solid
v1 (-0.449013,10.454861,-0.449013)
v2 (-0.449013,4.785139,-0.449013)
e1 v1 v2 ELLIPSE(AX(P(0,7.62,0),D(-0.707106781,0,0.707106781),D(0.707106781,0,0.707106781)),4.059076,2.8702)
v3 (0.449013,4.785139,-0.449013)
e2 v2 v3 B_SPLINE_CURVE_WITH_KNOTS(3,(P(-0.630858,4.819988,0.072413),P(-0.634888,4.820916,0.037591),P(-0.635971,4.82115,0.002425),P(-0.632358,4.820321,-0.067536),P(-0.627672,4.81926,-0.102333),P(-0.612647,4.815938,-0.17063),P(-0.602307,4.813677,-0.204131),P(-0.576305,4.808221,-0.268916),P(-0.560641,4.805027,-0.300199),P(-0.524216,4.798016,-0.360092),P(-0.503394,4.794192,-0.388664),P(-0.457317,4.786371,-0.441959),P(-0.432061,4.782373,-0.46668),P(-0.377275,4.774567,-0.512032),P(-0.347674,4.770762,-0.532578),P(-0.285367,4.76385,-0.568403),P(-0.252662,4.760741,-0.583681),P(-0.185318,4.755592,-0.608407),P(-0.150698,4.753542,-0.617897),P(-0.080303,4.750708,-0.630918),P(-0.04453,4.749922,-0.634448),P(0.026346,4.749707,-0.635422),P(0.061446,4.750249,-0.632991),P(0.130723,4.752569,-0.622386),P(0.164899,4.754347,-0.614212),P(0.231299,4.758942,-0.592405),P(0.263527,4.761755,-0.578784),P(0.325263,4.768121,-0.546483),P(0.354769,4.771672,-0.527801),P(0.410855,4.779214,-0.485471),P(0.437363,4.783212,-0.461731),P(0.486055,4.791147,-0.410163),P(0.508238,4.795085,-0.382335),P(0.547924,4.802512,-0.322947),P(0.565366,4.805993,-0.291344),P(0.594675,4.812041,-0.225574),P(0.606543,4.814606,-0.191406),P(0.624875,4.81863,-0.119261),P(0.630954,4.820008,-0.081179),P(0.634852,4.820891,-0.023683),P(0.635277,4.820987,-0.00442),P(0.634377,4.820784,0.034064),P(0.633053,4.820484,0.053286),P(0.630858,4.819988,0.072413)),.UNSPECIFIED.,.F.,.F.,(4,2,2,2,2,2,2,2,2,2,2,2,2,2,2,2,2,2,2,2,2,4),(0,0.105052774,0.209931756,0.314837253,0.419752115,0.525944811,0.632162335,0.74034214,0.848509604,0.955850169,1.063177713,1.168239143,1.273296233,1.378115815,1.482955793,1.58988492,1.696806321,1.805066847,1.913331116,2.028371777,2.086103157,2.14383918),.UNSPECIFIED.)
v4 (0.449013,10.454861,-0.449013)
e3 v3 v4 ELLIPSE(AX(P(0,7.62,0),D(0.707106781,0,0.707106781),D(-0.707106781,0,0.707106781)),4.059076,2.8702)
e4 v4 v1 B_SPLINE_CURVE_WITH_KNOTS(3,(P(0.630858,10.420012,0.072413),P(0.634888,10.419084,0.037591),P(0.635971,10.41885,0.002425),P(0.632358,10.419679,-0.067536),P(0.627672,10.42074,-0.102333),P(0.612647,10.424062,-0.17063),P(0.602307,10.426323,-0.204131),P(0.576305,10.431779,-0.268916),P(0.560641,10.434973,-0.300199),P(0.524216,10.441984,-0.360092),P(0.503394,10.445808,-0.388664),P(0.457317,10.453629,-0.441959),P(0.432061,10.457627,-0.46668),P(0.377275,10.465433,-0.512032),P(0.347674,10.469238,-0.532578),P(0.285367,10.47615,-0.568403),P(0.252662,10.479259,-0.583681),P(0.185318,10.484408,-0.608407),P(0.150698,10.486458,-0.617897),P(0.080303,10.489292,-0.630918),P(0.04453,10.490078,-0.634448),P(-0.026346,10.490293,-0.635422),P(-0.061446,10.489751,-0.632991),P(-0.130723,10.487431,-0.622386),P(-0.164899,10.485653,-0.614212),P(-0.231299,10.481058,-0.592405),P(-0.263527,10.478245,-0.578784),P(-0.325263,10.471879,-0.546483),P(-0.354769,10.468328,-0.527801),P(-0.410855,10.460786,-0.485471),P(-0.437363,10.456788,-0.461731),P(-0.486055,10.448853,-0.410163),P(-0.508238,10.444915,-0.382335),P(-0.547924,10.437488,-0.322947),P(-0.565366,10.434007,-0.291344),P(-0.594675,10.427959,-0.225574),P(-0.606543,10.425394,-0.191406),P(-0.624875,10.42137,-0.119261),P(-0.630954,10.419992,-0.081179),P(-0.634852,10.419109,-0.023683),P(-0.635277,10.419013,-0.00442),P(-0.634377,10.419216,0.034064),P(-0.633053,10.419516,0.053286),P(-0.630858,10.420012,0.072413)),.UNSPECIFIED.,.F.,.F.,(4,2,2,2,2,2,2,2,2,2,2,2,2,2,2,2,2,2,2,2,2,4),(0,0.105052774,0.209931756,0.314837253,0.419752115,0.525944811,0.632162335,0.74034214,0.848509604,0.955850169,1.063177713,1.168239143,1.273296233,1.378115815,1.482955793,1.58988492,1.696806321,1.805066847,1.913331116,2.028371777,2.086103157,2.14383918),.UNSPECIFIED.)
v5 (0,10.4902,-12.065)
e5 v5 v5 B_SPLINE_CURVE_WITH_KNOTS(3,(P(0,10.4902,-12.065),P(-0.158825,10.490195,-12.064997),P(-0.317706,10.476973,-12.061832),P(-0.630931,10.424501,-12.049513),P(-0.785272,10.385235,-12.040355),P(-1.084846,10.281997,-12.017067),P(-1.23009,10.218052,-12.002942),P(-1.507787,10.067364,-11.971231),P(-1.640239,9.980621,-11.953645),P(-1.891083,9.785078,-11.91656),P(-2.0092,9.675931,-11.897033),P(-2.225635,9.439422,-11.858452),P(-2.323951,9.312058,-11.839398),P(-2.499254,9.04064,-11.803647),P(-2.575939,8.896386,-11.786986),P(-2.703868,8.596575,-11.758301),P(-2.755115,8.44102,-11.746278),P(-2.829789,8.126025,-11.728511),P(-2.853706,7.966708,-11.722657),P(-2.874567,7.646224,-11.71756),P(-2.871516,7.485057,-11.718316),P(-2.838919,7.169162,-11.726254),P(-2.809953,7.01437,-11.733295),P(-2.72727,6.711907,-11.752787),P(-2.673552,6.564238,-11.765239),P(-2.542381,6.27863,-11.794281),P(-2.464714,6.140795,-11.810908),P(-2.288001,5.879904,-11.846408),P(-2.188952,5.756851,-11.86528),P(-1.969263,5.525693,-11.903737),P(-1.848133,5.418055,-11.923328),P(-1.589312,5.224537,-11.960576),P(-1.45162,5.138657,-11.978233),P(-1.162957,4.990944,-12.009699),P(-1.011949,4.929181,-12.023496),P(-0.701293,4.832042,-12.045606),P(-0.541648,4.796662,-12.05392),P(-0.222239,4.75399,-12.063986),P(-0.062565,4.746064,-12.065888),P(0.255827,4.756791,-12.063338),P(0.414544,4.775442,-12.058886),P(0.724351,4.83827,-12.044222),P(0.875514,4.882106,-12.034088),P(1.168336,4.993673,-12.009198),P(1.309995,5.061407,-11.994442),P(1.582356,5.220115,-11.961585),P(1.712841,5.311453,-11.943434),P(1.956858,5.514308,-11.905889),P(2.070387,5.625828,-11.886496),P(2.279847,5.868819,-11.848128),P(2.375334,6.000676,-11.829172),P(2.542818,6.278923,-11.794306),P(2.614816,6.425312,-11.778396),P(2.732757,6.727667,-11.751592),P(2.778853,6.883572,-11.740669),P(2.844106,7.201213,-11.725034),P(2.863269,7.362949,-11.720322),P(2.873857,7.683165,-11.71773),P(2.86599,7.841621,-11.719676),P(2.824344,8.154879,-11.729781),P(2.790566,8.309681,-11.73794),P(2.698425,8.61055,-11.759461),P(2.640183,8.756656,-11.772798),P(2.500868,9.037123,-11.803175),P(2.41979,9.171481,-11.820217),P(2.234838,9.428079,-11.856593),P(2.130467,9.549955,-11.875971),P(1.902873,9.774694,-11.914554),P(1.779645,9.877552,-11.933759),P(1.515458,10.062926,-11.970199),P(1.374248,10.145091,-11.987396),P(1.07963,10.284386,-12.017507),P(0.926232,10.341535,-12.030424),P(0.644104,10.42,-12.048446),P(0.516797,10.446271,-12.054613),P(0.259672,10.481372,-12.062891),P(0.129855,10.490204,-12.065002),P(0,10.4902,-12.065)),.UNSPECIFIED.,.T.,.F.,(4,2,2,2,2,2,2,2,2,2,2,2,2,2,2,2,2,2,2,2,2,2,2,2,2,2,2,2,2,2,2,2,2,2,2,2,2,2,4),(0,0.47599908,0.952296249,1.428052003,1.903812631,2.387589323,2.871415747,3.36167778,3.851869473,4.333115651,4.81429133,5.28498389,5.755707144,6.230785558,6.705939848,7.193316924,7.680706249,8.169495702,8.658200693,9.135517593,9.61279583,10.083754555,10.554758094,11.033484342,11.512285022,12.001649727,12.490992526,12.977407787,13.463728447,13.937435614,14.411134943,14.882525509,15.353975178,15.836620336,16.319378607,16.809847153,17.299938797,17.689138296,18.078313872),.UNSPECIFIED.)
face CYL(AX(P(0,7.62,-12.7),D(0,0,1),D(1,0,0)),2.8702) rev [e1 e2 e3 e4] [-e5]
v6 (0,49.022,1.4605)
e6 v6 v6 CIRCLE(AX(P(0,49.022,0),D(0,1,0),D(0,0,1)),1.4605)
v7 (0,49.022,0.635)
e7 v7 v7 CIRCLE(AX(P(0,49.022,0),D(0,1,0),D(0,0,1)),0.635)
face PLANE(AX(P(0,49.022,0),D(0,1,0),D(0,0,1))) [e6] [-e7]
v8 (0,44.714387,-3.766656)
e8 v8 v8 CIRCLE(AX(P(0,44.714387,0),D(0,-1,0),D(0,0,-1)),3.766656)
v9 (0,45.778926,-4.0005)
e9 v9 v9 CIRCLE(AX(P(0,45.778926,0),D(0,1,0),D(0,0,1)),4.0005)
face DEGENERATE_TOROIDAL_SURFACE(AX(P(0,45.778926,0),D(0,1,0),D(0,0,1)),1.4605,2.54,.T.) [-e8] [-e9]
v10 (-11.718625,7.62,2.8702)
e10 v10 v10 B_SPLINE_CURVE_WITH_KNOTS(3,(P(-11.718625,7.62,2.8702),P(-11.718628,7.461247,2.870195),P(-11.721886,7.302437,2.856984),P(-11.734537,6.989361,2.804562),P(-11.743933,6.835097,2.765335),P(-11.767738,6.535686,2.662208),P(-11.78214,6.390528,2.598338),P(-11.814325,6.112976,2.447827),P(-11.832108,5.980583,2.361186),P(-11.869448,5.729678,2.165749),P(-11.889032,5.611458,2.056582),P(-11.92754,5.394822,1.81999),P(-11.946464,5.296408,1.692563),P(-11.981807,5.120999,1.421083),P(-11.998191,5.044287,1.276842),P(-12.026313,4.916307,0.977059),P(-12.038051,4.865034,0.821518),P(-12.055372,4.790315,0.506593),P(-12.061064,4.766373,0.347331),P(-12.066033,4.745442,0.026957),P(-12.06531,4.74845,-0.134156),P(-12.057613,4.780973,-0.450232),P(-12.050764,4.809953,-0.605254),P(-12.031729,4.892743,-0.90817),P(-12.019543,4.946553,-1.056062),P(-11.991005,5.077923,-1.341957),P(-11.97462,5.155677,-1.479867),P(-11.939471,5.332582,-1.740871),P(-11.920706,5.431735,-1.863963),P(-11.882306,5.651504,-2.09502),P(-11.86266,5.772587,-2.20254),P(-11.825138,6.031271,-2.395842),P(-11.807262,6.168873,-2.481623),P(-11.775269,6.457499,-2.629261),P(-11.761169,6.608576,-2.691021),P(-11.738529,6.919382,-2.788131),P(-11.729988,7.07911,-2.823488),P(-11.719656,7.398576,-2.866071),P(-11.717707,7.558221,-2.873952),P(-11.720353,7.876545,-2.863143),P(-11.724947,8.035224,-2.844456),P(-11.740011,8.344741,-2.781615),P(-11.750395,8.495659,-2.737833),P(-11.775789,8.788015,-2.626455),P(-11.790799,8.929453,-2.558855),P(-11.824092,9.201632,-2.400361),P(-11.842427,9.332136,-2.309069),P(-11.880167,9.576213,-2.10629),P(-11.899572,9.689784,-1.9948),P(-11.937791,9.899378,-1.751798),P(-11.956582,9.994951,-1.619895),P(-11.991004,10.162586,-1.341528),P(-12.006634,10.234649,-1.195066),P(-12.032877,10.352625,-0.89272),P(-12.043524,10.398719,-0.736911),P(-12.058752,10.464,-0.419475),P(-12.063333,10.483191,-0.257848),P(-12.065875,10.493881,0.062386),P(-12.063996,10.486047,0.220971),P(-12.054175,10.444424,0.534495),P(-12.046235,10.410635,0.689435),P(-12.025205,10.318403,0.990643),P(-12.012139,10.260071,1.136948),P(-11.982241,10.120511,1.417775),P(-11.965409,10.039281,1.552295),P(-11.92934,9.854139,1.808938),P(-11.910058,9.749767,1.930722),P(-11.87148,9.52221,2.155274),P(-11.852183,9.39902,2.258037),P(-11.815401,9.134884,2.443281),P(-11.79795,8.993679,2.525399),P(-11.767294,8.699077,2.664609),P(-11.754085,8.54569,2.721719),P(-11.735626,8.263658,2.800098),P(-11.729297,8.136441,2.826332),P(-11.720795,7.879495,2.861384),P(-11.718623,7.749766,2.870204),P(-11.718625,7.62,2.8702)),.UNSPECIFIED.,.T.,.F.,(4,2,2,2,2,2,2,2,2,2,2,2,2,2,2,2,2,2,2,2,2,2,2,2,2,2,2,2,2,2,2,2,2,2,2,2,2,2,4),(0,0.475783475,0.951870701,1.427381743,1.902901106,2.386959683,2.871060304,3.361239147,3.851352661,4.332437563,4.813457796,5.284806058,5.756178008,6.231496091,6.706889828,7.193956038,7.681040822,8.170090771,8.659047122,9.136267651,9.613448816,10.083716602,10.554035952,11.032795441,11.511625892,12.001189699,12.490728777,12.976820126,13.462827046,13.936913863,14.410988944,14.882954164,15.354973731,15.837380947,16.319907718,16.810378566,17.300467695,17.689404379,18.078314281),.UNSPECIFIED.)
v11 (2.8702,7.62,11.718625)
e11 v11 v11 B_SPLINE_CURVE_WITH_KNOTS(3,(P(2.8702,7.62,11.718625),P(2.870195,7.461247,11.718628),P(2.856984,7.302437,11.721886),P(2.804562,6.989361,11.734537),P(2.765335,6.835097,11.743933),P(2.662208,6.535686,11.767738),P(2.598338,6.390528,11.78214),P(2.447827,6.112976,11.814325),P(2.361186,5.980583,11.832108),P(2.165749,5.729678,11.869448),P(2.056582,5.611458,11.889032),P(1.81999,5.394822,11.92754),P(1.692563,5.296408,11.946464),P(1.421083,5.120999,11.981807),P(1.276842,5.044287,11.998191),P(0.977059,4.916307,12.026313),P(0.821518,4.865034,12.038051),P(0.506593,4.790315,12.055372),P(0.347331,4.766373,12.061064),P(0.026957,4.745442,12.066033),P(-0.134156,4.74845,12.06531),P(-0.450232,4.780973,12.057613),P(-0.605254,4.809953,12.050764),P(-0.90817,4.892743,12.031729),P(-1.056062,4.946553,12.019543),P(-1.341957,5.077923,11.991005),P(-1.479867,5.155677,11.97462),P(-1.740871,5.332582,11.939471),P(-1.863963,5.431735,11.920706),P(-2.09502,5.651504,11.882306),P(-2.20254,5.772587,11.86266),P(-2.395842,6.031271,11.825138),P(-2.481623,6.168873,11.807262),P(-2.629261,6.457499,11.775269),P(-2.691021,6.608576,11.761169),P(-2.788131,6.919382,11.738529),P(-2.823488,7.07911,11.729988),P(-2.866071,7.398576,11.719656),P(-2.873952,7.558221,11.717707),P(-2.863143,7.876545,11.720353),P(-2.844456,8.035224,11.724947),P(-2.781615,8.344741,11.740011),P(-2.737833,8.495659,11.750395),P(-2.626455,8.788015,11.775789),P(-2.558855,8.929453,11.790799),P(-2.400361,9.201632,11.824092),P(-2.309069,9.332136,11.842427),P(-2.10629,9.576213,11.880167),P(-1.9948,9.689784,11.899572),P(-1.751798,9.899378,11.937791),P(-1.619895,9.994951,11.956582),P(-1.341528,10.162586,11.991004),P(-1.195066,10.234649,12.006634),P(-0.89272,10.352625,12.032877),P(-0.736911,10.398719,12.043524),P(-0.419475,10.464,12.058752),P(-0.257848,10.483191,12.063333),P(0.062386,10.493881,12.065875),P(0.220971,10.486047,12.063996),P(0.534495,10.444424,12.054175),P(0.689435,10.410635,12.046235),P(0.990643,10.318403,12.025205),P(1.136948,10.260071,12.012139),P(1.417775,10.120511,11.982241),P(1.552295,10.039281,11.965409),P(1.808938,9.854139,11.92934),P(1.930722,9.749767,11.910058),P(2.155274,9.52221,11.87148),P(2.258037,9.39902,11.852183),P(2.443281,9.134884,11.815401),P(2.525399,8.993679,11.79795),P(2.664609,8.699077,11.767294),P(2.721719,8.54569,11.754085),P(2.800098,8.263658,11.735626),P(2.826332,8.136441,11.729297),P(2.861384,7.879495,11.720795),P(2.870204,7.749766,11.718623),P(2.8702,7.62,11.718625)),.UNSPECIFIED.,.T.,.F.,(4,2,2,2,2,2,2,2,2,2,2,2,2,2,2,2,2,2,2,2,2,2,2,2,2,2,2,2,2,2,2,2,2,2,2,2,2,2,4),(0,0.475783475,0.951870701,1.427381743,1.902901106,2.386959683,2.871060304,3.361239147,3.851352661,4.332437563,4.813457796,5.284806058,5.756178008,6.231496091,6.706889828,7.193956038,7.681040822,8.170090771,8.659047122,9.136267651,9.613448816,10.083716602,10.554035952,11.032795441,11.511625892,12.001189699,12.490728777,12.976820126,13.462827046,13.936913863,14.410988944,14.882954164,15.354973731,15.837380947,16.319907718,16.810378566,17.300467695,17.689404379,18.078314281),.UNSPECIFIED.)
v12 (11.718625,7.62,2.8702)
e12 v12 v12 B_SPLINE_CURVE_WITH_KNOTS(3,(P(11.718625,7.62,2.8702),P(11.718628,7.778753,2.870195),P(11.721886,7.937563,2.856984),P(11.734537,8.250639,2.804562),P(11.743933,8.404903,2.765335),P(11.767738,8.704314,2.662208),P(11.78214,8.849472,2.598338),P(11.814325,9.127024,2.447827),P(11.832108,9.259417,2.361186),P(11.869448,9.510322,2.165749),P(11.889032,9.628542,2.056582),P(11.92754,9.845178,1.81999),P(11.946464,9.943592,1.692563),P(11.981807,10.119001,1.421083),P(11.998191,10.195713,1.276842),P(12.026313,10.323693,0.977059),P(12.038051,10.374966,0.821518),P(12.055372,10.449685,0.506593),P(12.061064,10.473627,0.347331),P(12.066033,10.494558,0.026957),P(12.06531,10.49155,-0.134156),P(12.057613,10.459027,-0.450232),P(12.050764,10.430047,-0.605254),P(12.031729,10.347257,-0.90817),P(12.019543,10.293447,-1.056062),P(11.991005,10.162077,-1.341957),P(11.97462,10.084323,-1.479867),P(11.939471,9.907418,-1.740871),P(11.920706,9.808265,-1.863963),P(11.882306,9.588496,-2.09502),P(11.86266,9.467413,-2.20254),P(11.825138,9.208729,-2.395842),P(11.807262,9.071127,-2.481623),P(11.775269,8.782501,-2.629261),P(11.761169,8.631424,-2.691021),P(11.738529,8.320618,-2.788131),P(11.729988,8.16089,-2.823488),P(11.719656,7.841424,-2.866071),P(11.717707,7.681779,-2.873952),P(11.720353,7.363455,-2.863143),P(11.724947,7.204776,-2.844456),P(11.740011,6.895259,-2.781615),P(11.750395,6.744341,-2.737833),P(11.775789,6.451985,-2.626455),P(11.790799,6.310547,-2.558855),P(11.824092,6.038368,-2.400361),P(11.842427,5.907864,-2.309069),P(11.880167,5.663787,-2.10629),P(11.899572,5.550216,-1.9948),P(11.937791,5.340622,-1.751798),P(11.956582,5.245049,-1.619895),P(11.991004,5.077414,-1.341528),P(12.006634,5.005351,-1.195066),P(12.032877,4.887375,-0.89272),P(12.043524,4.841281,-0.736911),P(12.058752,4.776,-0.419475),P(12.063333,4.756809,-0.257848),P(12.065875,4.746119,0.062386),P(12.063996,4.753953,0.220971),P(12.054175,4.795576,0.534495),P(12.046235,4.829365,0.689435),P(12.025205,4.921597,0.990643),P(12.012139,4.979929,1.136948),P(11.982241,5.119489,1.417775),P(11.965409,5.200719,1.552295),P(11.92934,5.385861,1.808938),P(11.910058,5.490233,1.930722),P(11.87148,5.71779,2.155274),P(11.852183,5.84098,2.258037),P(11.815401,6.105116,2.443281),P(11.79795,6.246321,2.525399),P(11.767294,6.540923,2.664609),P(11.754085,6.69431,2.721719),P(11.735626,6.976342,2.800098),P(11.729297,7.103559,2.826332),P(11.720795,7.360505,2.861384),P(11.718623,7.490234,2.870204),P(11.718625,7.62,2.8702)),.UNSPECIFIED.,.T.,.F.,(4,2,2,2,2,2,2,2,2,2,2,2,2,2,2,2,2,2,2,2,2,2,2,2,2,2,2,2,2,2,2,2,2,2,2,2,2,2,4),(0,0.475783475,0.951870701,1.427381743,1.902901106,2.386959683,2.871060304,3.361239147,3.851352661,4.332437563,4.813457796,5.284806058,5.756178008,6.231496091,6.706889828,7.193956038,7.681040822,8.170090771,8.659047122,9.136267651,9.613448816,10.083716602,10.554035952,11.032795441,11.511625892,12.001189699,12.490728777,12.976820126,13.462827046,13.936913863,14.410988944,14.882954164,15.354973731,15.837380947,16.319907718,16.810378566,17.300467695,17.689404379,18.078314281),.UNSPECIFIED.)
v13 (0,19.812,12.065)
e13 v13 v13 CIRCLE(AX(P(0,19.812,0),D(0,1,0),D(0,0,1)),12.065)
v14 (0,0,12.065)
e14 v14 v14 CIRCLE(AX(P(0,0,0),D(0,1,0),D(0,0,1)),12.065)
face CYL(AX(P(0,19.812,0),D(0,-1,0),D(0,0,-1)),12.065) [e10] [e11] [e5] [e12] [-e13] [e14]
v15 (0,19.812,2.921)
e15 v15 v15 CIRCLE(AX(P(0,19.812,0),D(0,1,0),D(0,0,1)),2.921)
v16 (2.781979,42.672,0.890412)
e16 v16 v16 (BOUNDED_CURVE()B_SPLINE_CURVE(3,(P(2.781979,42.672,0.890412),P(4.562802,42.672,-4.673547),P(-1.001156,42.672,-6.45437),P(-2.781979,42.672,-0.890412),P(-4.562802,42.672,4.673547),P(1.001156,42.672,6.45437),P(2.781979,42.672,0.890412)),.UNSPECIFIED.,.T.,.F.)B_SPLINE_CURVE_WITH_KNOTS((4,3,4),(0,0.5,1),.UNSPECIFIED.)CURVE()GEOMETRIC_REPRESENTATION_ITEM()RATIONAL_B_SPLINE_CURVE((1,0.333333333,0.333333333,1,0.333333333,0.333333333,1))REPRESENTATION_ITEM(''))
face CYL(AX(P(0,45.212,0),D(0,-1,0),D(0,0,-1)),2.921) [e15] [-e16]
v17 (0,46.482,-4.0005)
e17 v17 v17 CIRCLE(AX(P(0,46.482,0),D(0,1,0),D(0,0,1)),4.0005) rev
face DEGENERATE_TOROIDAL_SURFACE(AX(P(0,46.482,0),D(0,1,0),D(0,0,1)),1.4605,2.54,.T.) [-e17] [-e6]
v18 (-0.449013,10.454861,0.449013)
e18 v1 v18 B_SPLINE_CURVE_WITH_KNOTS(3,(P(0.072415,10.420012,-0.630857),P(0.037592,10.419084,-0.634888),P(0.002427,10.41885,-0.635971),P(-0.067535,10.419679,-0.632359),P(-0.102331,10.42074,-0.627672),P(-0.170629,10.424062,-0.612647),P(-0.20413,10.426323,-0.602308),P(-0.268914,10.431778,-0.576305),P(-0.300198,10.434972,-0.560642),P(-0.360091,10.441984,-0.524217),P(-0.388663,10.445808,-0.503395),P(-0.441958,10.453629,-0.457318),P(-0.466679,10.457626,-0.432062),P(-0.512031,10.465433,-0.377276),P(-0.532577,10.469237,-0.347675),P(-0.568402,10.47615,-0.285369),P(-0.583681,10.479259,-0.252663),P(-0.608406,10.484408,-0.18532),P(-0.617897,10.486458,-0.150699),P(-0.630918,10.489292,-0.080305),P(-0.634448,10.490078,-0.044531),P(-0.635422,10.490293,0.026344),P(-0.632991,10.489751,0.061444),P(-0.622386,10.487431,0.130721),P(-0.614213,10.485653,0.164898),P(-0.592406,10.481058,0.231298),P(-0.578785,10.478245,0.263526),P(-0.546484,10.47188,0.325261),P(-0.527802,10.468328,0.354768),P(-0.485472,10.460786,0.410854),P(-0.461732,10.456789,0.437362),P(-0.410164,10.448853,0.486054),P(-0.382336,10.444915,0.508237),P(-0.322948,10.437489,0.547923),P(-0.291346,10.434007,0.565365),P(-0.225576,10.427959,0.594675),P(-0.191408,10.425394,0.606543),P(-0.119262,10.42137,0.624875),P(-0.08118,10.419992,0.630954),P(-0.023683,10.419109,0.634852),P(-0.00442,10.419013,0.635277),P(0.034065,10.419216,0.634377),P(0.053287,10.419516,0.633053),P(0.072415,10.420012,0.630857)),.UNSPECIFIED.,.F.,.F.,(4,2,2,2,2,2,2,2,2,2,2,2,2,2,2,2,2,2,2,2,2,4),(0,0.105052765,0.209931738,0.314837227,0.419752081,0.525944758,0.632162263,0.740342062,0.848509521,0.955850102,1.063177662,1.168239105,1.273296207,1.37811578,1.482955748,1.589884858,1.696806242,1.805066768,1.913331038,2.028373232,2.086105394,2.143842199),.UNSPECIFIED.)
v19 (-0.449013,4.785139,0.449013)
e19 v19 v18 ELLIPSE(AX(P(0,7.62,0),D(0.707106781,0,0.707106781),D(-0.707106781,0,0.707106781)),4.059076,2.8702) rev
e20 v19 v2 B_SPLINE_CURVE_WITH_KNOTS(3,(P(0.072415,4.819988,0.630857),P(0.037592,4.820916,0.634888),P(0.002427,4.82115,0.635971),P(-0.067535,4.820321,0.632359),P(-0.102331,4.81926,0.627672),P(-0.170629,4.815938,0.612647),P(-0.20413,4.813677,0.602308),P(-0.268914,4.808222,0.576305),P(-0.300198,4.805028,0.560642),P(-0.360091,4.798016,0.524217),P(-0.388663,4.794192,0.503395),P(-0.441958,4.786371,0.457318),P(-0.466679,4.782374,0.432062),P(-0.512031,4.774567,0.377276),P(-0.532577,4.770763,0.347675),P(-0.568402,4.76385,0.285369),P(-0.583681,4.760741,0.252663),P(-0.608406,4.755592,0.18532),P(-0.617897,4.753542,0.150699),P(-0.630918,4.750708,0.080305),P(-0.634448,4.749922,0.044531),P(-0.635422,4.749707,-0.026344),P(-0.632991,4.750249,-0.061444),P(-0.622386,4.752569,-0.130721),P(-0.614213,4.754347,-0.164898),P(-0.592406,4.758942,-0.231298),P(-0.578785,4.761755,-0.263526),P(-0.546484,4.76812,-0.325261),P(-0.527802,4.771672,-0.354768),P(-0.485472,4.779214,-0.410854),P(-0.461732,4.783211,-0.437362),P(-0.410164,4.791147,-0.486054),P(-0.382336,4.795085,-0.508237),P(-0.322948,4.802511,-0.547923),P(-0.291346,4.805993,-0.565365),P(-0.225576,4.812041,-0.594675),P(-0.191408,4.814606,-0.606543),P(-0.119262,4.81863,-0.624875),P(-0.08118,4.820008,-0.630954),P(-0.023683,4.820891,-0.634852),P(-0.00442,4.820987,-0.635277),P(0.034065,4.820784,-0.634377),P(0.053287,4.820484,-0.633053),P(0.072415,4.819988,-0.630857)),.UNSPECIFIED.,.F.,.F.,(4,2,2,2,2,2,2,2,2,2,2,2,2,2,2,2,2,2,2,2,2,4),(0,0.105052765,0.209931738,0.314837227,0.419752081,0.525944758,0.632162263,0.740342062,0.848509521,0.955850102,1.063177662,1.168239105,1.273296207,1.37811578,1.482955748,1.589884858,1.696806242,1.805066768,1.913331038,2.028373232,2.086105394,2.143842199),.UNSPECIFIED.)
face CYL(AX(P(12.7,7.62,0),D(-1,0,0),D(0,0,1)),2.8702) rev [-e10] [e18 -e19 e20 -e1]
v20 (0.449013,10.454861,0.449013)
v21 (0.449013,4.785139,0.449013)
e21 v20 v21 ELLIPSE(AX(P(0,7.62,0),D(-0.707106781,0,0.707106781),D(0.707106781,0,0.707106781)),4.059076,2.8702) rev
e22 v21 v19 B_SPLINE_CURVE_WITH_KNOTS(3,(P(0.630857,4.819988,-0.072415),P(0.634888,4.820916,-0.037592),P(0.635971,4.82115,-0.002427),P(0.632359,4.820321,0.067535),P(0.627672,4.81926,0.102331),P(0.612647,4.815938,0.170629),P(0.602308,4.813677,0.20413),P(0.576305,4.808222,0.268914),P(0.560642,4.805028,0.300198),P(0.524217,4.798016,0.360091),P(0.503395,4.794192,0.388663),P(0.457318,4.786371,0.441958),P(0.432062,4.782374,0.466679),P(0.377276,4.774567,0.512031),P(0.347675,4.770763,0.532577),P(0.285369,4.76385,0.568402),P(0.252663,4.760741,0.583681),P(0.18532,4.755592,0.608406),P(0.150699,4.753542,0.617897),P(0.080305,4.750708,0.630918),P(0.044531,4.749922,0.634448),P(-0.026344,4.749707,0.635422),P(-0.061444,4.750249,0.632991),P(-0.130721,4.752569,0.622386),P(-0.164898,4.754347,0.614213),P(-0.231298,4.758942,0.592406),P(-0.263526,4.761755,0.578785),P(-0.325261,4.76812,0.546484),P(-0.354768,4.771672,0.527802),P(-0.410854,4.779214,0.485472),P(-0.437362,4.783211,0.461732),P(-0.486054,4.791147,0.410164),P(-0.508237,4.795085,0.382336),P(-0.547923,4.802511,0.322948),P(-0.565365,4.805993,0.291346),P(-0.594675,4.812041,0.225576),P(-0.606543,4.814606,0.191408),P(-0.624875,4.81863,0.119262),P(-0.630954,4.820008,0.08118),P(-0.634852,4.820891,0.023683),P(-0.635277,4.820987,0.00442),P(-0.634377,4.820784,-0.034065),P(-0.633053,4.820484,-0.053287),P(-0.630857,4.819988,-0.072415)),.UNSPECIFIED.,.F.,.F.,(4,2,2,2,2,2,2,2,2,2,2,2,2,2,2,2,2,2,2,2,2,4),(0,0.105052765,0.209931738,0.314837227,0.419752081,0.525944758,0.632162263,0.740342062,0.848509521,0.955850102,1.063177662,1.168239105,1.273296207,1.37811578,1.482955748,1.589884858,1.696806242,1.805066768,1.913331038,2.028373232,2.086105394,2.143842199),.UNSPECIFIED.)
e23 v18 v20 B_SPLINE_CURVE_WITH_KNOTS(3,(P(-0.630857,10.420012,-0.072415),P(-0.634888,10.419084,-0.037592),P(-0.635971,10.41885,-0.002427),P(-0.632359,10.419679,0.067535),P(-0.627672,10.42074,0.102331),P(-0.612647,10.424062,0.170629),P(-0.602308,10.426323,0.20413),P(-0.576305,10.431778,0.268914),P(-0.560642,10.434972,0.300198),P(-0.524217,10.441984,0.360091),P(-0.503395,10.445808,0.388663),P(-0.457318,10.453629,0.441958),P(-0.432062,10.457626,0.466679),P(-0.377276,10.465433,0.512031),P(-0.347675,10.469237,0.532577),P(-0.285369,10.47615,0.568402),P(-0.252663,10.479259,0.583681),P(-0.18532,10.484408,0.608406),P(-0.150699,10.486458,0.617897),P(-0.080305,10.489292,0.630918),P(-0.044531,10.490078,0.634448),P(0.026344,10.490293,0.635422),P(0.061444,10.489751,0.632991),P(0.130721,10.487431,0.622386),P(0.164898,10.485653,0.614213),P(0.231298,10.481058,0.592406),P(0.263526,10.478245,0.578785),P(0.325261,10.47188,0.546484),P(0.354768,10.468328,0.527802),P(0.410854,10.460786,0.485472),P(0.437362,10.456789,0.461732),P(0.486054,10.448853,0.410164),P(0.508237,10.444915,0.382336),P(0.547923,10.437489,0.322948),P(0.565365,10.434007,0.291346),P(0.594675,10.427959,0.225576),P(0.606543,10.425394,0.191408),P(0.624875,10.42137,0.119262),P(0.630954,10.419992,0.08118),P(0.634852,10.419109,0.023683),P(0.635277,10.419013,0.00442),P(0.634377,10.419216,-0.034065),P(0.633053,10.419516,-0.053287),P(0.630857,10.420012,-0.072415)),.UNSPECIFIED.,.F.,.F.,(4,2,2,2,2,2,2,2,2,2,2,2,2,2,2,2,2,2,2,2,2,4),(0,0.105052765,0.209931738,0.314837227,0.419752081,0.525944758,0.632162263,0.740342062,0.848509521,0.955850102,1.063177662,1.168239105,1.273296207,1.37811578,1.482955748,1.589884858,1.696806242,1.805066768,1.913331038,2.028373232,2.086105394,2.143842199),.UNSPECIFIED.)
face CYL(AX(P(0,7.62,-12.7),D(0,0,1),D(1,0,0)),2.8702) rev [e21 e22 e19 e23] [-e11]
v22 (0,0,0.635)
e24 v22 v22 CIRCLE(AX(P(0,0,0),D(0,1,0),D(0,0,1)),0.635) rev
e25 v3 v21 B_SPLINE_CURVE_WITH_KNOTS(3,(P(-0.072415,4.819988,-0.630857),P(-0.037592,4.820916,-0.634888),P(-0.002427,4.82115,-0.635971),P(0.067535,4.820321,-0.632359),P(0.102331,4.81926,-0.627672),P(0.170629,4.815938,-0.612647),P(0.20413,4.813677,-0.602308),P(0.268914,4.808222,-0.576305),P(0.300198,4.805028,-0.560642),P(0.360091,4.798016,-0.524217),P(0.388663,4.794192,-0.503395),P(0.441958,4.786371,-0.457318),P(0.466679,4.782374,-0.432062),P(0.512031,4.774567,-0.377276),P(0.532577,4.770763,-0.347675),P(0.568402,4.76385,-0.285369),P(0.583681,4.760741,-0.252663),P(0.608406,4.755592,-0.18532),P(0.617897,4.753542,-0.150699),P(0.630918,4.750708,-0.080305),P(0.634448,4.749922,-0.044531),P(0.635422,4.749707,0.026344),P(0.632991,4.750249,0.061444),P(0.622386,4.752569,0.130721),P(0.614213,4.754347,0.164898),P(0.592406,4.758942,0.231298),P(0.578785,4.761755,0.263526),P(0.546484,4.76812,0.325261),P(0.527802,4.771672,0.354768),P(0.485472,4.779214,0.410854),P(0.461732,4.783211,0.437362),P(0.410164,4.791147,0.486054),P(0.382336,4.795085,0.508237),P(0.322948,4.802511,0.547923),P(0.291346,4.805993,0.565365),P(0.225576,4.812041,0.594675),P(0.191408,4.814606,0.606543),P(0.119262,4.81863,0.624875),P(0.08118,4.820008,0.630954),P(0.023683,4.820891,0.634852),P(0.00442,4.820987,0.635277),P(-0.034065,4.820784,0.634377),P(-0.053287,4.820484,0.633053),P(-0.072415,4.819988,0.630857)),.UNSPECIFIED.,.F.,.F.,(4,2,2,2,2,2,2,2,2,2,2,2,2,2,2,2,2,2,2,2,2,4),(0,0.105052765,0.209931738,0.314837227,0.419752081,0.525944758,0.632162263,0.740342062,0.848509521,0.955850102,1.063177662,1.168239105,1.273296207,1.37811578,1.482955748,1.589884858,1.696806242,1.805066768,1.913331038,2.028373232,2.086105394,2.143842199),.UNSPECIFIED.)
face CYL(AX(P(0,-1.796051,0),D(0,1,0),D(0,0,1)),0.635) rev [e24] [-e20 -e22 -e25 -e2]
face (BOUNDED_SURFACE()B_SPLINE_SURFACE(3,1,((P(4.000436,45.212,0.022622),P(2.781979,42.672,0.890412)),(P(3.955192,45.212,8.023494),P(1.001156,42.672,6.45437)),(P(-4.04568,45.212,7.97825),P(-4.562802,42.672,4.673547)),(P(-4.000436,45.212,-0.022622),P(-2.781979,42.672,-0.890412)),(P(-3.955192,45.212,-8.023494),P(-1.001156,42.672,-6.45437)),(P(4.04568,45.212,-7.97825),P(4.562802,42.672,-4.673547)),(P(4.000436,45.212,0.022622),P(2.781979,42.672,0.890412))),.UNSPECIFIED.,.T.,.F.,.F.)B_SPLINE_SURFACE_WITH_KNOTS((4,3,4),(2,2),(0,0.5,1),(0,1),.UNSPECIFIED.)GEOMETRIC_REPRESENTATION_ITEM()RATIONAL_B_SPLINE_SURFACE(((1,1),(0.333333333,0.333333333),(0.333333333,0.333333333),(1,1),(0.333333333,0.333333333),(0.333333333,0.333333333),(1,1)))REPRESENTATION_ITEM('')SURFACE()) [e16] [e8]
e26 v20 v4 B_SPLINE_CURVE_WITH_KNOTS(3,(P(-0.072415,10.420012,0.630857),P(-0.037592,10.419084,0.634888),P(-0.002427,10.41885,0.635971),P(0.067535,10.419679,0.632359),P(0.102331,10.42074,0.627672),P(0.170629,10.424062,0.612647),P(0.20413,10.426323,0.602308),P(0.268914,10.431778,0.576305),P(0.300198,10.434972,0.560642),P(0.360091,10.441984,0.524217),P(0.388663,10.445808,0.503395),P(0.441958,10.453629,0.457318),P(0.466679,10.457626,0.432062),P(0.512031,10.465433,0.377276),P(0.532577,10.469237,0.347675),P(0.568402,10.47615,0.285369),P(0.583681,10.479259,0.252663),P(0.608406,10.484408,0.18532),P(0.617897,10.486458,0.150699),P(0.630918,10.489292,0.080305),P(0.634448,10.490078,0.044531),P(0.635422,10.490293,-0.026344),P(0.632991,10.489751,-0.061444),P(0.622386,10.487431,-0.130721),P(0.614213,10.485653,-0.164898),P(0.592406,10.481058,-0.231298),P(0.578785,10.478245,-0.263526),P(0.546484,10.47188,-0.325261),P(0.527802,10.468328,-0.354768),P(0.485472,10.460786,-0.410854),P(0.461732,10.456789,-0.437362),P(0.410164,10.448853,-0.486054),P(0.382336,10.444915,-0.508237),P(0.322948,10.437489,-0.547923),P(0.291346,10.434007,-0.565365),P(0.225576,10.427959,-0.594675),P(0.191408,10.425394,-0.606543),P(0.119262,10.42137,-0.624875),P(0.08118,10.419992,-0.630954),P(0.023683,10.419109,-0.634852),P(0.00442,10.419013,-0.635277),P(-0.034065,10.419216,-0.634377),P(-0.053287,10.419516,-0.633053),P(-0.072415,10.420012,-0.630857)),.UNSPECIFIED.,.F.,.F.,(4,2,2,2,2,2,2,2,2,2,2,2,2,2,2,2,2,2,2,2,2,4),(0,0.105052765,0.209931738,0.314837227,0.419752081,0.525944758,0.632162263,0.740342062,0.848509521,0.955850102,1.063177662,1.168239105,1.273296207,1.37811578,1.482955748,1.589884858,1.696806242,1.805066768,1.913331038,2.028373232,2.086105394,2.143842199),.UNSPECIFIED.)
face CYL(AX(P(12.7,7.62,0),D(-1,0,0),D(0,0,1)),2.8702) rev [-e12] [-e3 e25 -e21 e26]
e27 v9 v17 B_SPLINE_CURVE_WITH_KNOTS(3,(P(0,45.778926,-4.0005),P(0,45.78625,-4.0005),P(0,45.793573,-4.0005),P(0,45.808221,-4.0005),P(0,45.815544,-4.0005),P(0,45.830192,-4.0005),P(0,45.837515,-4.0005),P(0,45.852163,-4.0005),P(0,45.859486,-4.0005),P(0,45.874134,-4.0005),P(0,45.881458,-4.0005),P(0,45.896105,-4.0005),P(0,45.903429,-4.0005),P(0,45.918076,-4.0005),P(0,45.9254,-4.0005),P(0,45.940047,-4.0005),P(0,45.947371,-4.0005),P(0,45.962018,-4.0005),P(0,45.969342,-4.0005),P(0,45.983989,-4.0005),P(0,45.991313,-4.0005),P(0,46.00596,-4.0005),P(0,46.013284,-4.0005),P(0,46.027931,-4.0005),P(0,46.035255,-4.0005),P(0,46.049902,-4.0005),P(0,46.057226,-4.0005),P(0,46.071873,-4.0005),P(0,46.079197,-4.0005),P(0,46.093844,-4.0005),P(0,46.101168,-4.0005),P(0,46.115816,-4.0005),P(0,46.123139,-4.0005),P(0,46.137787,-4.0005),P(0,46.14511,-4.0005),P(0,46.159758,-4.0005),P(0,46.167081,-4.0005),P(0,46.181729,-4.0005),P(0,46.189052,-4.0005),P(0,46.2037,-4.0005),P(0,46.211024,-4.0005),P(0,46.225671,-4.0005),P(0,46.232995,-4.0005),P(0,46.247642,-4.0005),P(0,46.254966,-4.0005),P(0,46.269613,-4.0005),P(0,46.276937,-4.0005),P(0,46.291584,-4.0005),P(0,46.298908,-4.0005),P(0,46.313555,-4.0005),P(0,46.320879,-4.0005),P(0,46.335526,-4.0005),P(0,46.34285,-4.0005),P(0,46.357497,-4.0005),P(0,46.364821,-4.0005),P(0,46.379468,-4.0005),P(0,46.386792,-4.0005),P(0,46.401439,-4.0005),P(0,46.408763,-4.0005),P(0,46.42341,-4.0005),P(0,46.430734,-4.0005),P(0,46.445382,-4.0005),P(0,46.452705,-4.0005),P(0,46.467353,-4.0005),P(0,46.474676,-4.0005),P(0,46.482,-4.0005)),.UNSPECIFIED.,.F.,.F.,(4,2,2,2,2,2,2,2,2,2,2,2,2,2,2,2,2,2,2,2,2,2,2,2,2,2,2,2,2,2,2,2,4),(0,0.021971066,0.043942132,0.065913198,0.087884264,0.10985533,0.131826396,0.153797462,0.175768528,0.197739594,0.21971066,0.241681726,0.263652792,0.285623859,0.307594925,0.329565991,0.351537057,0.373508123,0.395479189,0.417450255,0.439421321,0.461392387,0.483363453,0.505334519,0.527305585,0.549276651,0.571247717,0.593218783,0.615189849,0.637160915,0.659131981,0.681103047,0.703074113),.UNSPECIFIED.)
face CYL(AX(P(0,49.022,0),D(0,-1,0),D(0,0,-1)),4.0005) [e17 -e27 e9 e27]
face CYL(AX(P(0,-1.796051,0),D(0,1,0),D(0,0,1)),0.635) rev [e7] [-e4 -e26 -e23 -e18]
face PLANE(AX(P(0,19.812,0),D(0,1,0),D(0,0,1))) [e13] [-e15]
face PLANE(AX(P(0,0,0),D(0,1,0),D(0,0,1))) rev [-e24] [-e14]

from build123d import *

# Parameters (mm, degrees)
SKETCH1_R           = 12.065
BOSS_EXTRUDE1_DEPTH = 19.812
SKETCH2_R           = 2.921
BOSS_EXTRUDE2_DEPTH = 25.4
SKETCH3_R           = 4.0005
BOSS_EXTRUDE3_DEPTH = 3.81
FILLET3_R           = 2.54
SKETCH7_R           = 2.8702
CUT_EXTRUDE1_DEPTH  = 12.7
CIRPATTERN1_COUNT   = 2
CIRPATTERN1_ANGLE   = 90
FILLET4_R           = 2.54
CUT_EXTRUDE2_REACH  = 53.907
SKETCH9_R           = 0.635


with BuildPart() as part:
    # Sketch1 → Boss-Extrude1 (new body)
    with BuildSketch(Plane(origin=(0, 0, 0), x_dir=(1, 0, 0), z_dir=(0, 1, 0))):
        with Locations(Location((0, 0, 0), (0, 0, 270))):
            Circle(SKETCH1_R)
    extrude(amount=BOSS_EXTRUDE1_DEPTH)

    # Sketch2 → Boss-Extrude2 (add)
    with BuildSketch(Plane(origin=(0, 19.812, 0), x_dir=(1, 0, 0), z_dir=(0, 1, 0))):
        with Locations(Location((0, 0, 0), (0, 0, 270))):
            Circle(SKETCH2_R)
    extrude(amount=BOSS_EXTRUDE2_DEPTH)

    # Sketch3 → Boss-Extrude3 (add)
    with BuildSketch(Plane(origin=(0, 45.212, 0), x_dir=(1, 0, 0), z_dir=(0, 1, 0))):
        with Locations(Location((0, 0, 0), (0, 0, 90))):
            Circle(SKETCH3_R)
    extrude(amount=BOSS_EXTRUDE3_DEPTH)

    # Fillet3
    fillet3_edges = [part.edges().sort_by_distance(p)[0] for p in [
        (0, 49.022, 4.0005),
    ]]
    fillet(fillet3_edges, radius=FILLET3_R)

    # Sketch7 → Cut-Extrude1 (cut, symmetric)
    with BuildSketch(Plane.XY):
        with Locations(Location((0, 7.62, 0), (0, 0, 90.000000025))):
            Circle(SKETCH7_R)
    cut_extrude1 = extrude(amount=CUT_EXTRUDE1_DEPTH, both=True, mode=Mode.SUBTRACT)

    # CirPattern1: Cut-Extrude1 ×2 about axis
    cirpattern1_axis = Axis((0, 45.212, 0), (0, -1, 0))
    for i in range(1, CIRPATTERN1_COUNT):
        add(cut_extrude1.rotate(cirpattern1_axis, i * CIRPATTERN1_ANGLE / (CIRPATTERN1_COUNT - 1)), mode=Mode.SUBTRACT)

    # Loft1: read off the stored shape, not the designer's step
    # Loft1: loft between two sections, ruled curve by curve
    loft1_from = [
        Edge.make_bspline([(4.000436037, 45.212, 0.022622174), (3.955191689, 45.212, 8.023494248), (-4.045680385, 45.212, 7.9782499), (-4.000436037, 45.212, -0.022622174), (-3.955191689, 45.212, -8.023494248), (4.045680385, 45.212, -7.9782499), (4.000436037, 45.212, 0.022622174)], [0, 0, 0, 0, 0.5, 0.5, 0.5, 1, 1, 1, 1], 3, [1, 0.333333333, 0.333333333, 1, 0.333333333, 0.333333333, 1]),
    ]
    loft1_to = [
        Edge.make_bspline([(2.781979214, 42.672, 0.890411509), (1.001156196, 42.672, 6.454369936), (-4.562802231, 42.672, 4.673546919), (-2.781979214, 42.672, -0.890411509), (-1.001156196, 42.672, -6.454369936), (4.562802231, 42.672, -4.673546919), (2.781979214, 42.672, 0.890411509)], [0, 0, 0, 0, 0.5, 0.5, 0.5, 1, 1, 1, 1], 3, [1, 0.333333333, 0.333333333, 1, 0.333333333, 0.333333333, 1]),
    ]
    loft1 = Solid(Shell([*[Face.make_surface_from_curves(loft1_from[k], loft1_to[k]) for k in range(1)], Face(Wire(loft1_from)), Face(Wire(loft1_to))]))
    add(loft1)

    # Fillet4
    fillet4_edges = [part.edges().sort_by_distance(p)[0] for p in [
        (-2.836767549, 45.212, 2.820771193),
    ]]
    fillet(fillet4_edges, radius=FILLET4_R)

    # Cut-Extrude2: up to this face of the body (flat: up to its plane)
    cut_extrude2_end = Plane(part.part.faces().sort_by_distance((0, 0, 0))[0])
    # Sketch9 → Cut-Extrude2 (cut, up to the picked face)
    with BuildSketch(Plane(origin=(0, 49.022, 0), x_dir=(1, 0, 0), z_dir=(0, 1, 0)), mode=Mode.PRIVATE) as cut_extrude2_sk1:
        with Locations(Location((0, 0, 0), (0, 0, 270))):
            Circle(SKETCH9_R)
    cut_extrude2_tool1 = split(extrude(cut_extrude2_sk1.sketch, amount=-CUT_EXTRUDE2_REACH, mode=Mode.PRIVATE), bisect_by=cut_extrude2_end, keep=Keep.BOTH, mode=Mode.PRIVATE)
    add(cut_extrude2_tool1.solids().sort_by(Axis((0, 49.022, 0), (0, -1, 0)))[0], mode=Mode.SUBTRACT)


solid = part.part
